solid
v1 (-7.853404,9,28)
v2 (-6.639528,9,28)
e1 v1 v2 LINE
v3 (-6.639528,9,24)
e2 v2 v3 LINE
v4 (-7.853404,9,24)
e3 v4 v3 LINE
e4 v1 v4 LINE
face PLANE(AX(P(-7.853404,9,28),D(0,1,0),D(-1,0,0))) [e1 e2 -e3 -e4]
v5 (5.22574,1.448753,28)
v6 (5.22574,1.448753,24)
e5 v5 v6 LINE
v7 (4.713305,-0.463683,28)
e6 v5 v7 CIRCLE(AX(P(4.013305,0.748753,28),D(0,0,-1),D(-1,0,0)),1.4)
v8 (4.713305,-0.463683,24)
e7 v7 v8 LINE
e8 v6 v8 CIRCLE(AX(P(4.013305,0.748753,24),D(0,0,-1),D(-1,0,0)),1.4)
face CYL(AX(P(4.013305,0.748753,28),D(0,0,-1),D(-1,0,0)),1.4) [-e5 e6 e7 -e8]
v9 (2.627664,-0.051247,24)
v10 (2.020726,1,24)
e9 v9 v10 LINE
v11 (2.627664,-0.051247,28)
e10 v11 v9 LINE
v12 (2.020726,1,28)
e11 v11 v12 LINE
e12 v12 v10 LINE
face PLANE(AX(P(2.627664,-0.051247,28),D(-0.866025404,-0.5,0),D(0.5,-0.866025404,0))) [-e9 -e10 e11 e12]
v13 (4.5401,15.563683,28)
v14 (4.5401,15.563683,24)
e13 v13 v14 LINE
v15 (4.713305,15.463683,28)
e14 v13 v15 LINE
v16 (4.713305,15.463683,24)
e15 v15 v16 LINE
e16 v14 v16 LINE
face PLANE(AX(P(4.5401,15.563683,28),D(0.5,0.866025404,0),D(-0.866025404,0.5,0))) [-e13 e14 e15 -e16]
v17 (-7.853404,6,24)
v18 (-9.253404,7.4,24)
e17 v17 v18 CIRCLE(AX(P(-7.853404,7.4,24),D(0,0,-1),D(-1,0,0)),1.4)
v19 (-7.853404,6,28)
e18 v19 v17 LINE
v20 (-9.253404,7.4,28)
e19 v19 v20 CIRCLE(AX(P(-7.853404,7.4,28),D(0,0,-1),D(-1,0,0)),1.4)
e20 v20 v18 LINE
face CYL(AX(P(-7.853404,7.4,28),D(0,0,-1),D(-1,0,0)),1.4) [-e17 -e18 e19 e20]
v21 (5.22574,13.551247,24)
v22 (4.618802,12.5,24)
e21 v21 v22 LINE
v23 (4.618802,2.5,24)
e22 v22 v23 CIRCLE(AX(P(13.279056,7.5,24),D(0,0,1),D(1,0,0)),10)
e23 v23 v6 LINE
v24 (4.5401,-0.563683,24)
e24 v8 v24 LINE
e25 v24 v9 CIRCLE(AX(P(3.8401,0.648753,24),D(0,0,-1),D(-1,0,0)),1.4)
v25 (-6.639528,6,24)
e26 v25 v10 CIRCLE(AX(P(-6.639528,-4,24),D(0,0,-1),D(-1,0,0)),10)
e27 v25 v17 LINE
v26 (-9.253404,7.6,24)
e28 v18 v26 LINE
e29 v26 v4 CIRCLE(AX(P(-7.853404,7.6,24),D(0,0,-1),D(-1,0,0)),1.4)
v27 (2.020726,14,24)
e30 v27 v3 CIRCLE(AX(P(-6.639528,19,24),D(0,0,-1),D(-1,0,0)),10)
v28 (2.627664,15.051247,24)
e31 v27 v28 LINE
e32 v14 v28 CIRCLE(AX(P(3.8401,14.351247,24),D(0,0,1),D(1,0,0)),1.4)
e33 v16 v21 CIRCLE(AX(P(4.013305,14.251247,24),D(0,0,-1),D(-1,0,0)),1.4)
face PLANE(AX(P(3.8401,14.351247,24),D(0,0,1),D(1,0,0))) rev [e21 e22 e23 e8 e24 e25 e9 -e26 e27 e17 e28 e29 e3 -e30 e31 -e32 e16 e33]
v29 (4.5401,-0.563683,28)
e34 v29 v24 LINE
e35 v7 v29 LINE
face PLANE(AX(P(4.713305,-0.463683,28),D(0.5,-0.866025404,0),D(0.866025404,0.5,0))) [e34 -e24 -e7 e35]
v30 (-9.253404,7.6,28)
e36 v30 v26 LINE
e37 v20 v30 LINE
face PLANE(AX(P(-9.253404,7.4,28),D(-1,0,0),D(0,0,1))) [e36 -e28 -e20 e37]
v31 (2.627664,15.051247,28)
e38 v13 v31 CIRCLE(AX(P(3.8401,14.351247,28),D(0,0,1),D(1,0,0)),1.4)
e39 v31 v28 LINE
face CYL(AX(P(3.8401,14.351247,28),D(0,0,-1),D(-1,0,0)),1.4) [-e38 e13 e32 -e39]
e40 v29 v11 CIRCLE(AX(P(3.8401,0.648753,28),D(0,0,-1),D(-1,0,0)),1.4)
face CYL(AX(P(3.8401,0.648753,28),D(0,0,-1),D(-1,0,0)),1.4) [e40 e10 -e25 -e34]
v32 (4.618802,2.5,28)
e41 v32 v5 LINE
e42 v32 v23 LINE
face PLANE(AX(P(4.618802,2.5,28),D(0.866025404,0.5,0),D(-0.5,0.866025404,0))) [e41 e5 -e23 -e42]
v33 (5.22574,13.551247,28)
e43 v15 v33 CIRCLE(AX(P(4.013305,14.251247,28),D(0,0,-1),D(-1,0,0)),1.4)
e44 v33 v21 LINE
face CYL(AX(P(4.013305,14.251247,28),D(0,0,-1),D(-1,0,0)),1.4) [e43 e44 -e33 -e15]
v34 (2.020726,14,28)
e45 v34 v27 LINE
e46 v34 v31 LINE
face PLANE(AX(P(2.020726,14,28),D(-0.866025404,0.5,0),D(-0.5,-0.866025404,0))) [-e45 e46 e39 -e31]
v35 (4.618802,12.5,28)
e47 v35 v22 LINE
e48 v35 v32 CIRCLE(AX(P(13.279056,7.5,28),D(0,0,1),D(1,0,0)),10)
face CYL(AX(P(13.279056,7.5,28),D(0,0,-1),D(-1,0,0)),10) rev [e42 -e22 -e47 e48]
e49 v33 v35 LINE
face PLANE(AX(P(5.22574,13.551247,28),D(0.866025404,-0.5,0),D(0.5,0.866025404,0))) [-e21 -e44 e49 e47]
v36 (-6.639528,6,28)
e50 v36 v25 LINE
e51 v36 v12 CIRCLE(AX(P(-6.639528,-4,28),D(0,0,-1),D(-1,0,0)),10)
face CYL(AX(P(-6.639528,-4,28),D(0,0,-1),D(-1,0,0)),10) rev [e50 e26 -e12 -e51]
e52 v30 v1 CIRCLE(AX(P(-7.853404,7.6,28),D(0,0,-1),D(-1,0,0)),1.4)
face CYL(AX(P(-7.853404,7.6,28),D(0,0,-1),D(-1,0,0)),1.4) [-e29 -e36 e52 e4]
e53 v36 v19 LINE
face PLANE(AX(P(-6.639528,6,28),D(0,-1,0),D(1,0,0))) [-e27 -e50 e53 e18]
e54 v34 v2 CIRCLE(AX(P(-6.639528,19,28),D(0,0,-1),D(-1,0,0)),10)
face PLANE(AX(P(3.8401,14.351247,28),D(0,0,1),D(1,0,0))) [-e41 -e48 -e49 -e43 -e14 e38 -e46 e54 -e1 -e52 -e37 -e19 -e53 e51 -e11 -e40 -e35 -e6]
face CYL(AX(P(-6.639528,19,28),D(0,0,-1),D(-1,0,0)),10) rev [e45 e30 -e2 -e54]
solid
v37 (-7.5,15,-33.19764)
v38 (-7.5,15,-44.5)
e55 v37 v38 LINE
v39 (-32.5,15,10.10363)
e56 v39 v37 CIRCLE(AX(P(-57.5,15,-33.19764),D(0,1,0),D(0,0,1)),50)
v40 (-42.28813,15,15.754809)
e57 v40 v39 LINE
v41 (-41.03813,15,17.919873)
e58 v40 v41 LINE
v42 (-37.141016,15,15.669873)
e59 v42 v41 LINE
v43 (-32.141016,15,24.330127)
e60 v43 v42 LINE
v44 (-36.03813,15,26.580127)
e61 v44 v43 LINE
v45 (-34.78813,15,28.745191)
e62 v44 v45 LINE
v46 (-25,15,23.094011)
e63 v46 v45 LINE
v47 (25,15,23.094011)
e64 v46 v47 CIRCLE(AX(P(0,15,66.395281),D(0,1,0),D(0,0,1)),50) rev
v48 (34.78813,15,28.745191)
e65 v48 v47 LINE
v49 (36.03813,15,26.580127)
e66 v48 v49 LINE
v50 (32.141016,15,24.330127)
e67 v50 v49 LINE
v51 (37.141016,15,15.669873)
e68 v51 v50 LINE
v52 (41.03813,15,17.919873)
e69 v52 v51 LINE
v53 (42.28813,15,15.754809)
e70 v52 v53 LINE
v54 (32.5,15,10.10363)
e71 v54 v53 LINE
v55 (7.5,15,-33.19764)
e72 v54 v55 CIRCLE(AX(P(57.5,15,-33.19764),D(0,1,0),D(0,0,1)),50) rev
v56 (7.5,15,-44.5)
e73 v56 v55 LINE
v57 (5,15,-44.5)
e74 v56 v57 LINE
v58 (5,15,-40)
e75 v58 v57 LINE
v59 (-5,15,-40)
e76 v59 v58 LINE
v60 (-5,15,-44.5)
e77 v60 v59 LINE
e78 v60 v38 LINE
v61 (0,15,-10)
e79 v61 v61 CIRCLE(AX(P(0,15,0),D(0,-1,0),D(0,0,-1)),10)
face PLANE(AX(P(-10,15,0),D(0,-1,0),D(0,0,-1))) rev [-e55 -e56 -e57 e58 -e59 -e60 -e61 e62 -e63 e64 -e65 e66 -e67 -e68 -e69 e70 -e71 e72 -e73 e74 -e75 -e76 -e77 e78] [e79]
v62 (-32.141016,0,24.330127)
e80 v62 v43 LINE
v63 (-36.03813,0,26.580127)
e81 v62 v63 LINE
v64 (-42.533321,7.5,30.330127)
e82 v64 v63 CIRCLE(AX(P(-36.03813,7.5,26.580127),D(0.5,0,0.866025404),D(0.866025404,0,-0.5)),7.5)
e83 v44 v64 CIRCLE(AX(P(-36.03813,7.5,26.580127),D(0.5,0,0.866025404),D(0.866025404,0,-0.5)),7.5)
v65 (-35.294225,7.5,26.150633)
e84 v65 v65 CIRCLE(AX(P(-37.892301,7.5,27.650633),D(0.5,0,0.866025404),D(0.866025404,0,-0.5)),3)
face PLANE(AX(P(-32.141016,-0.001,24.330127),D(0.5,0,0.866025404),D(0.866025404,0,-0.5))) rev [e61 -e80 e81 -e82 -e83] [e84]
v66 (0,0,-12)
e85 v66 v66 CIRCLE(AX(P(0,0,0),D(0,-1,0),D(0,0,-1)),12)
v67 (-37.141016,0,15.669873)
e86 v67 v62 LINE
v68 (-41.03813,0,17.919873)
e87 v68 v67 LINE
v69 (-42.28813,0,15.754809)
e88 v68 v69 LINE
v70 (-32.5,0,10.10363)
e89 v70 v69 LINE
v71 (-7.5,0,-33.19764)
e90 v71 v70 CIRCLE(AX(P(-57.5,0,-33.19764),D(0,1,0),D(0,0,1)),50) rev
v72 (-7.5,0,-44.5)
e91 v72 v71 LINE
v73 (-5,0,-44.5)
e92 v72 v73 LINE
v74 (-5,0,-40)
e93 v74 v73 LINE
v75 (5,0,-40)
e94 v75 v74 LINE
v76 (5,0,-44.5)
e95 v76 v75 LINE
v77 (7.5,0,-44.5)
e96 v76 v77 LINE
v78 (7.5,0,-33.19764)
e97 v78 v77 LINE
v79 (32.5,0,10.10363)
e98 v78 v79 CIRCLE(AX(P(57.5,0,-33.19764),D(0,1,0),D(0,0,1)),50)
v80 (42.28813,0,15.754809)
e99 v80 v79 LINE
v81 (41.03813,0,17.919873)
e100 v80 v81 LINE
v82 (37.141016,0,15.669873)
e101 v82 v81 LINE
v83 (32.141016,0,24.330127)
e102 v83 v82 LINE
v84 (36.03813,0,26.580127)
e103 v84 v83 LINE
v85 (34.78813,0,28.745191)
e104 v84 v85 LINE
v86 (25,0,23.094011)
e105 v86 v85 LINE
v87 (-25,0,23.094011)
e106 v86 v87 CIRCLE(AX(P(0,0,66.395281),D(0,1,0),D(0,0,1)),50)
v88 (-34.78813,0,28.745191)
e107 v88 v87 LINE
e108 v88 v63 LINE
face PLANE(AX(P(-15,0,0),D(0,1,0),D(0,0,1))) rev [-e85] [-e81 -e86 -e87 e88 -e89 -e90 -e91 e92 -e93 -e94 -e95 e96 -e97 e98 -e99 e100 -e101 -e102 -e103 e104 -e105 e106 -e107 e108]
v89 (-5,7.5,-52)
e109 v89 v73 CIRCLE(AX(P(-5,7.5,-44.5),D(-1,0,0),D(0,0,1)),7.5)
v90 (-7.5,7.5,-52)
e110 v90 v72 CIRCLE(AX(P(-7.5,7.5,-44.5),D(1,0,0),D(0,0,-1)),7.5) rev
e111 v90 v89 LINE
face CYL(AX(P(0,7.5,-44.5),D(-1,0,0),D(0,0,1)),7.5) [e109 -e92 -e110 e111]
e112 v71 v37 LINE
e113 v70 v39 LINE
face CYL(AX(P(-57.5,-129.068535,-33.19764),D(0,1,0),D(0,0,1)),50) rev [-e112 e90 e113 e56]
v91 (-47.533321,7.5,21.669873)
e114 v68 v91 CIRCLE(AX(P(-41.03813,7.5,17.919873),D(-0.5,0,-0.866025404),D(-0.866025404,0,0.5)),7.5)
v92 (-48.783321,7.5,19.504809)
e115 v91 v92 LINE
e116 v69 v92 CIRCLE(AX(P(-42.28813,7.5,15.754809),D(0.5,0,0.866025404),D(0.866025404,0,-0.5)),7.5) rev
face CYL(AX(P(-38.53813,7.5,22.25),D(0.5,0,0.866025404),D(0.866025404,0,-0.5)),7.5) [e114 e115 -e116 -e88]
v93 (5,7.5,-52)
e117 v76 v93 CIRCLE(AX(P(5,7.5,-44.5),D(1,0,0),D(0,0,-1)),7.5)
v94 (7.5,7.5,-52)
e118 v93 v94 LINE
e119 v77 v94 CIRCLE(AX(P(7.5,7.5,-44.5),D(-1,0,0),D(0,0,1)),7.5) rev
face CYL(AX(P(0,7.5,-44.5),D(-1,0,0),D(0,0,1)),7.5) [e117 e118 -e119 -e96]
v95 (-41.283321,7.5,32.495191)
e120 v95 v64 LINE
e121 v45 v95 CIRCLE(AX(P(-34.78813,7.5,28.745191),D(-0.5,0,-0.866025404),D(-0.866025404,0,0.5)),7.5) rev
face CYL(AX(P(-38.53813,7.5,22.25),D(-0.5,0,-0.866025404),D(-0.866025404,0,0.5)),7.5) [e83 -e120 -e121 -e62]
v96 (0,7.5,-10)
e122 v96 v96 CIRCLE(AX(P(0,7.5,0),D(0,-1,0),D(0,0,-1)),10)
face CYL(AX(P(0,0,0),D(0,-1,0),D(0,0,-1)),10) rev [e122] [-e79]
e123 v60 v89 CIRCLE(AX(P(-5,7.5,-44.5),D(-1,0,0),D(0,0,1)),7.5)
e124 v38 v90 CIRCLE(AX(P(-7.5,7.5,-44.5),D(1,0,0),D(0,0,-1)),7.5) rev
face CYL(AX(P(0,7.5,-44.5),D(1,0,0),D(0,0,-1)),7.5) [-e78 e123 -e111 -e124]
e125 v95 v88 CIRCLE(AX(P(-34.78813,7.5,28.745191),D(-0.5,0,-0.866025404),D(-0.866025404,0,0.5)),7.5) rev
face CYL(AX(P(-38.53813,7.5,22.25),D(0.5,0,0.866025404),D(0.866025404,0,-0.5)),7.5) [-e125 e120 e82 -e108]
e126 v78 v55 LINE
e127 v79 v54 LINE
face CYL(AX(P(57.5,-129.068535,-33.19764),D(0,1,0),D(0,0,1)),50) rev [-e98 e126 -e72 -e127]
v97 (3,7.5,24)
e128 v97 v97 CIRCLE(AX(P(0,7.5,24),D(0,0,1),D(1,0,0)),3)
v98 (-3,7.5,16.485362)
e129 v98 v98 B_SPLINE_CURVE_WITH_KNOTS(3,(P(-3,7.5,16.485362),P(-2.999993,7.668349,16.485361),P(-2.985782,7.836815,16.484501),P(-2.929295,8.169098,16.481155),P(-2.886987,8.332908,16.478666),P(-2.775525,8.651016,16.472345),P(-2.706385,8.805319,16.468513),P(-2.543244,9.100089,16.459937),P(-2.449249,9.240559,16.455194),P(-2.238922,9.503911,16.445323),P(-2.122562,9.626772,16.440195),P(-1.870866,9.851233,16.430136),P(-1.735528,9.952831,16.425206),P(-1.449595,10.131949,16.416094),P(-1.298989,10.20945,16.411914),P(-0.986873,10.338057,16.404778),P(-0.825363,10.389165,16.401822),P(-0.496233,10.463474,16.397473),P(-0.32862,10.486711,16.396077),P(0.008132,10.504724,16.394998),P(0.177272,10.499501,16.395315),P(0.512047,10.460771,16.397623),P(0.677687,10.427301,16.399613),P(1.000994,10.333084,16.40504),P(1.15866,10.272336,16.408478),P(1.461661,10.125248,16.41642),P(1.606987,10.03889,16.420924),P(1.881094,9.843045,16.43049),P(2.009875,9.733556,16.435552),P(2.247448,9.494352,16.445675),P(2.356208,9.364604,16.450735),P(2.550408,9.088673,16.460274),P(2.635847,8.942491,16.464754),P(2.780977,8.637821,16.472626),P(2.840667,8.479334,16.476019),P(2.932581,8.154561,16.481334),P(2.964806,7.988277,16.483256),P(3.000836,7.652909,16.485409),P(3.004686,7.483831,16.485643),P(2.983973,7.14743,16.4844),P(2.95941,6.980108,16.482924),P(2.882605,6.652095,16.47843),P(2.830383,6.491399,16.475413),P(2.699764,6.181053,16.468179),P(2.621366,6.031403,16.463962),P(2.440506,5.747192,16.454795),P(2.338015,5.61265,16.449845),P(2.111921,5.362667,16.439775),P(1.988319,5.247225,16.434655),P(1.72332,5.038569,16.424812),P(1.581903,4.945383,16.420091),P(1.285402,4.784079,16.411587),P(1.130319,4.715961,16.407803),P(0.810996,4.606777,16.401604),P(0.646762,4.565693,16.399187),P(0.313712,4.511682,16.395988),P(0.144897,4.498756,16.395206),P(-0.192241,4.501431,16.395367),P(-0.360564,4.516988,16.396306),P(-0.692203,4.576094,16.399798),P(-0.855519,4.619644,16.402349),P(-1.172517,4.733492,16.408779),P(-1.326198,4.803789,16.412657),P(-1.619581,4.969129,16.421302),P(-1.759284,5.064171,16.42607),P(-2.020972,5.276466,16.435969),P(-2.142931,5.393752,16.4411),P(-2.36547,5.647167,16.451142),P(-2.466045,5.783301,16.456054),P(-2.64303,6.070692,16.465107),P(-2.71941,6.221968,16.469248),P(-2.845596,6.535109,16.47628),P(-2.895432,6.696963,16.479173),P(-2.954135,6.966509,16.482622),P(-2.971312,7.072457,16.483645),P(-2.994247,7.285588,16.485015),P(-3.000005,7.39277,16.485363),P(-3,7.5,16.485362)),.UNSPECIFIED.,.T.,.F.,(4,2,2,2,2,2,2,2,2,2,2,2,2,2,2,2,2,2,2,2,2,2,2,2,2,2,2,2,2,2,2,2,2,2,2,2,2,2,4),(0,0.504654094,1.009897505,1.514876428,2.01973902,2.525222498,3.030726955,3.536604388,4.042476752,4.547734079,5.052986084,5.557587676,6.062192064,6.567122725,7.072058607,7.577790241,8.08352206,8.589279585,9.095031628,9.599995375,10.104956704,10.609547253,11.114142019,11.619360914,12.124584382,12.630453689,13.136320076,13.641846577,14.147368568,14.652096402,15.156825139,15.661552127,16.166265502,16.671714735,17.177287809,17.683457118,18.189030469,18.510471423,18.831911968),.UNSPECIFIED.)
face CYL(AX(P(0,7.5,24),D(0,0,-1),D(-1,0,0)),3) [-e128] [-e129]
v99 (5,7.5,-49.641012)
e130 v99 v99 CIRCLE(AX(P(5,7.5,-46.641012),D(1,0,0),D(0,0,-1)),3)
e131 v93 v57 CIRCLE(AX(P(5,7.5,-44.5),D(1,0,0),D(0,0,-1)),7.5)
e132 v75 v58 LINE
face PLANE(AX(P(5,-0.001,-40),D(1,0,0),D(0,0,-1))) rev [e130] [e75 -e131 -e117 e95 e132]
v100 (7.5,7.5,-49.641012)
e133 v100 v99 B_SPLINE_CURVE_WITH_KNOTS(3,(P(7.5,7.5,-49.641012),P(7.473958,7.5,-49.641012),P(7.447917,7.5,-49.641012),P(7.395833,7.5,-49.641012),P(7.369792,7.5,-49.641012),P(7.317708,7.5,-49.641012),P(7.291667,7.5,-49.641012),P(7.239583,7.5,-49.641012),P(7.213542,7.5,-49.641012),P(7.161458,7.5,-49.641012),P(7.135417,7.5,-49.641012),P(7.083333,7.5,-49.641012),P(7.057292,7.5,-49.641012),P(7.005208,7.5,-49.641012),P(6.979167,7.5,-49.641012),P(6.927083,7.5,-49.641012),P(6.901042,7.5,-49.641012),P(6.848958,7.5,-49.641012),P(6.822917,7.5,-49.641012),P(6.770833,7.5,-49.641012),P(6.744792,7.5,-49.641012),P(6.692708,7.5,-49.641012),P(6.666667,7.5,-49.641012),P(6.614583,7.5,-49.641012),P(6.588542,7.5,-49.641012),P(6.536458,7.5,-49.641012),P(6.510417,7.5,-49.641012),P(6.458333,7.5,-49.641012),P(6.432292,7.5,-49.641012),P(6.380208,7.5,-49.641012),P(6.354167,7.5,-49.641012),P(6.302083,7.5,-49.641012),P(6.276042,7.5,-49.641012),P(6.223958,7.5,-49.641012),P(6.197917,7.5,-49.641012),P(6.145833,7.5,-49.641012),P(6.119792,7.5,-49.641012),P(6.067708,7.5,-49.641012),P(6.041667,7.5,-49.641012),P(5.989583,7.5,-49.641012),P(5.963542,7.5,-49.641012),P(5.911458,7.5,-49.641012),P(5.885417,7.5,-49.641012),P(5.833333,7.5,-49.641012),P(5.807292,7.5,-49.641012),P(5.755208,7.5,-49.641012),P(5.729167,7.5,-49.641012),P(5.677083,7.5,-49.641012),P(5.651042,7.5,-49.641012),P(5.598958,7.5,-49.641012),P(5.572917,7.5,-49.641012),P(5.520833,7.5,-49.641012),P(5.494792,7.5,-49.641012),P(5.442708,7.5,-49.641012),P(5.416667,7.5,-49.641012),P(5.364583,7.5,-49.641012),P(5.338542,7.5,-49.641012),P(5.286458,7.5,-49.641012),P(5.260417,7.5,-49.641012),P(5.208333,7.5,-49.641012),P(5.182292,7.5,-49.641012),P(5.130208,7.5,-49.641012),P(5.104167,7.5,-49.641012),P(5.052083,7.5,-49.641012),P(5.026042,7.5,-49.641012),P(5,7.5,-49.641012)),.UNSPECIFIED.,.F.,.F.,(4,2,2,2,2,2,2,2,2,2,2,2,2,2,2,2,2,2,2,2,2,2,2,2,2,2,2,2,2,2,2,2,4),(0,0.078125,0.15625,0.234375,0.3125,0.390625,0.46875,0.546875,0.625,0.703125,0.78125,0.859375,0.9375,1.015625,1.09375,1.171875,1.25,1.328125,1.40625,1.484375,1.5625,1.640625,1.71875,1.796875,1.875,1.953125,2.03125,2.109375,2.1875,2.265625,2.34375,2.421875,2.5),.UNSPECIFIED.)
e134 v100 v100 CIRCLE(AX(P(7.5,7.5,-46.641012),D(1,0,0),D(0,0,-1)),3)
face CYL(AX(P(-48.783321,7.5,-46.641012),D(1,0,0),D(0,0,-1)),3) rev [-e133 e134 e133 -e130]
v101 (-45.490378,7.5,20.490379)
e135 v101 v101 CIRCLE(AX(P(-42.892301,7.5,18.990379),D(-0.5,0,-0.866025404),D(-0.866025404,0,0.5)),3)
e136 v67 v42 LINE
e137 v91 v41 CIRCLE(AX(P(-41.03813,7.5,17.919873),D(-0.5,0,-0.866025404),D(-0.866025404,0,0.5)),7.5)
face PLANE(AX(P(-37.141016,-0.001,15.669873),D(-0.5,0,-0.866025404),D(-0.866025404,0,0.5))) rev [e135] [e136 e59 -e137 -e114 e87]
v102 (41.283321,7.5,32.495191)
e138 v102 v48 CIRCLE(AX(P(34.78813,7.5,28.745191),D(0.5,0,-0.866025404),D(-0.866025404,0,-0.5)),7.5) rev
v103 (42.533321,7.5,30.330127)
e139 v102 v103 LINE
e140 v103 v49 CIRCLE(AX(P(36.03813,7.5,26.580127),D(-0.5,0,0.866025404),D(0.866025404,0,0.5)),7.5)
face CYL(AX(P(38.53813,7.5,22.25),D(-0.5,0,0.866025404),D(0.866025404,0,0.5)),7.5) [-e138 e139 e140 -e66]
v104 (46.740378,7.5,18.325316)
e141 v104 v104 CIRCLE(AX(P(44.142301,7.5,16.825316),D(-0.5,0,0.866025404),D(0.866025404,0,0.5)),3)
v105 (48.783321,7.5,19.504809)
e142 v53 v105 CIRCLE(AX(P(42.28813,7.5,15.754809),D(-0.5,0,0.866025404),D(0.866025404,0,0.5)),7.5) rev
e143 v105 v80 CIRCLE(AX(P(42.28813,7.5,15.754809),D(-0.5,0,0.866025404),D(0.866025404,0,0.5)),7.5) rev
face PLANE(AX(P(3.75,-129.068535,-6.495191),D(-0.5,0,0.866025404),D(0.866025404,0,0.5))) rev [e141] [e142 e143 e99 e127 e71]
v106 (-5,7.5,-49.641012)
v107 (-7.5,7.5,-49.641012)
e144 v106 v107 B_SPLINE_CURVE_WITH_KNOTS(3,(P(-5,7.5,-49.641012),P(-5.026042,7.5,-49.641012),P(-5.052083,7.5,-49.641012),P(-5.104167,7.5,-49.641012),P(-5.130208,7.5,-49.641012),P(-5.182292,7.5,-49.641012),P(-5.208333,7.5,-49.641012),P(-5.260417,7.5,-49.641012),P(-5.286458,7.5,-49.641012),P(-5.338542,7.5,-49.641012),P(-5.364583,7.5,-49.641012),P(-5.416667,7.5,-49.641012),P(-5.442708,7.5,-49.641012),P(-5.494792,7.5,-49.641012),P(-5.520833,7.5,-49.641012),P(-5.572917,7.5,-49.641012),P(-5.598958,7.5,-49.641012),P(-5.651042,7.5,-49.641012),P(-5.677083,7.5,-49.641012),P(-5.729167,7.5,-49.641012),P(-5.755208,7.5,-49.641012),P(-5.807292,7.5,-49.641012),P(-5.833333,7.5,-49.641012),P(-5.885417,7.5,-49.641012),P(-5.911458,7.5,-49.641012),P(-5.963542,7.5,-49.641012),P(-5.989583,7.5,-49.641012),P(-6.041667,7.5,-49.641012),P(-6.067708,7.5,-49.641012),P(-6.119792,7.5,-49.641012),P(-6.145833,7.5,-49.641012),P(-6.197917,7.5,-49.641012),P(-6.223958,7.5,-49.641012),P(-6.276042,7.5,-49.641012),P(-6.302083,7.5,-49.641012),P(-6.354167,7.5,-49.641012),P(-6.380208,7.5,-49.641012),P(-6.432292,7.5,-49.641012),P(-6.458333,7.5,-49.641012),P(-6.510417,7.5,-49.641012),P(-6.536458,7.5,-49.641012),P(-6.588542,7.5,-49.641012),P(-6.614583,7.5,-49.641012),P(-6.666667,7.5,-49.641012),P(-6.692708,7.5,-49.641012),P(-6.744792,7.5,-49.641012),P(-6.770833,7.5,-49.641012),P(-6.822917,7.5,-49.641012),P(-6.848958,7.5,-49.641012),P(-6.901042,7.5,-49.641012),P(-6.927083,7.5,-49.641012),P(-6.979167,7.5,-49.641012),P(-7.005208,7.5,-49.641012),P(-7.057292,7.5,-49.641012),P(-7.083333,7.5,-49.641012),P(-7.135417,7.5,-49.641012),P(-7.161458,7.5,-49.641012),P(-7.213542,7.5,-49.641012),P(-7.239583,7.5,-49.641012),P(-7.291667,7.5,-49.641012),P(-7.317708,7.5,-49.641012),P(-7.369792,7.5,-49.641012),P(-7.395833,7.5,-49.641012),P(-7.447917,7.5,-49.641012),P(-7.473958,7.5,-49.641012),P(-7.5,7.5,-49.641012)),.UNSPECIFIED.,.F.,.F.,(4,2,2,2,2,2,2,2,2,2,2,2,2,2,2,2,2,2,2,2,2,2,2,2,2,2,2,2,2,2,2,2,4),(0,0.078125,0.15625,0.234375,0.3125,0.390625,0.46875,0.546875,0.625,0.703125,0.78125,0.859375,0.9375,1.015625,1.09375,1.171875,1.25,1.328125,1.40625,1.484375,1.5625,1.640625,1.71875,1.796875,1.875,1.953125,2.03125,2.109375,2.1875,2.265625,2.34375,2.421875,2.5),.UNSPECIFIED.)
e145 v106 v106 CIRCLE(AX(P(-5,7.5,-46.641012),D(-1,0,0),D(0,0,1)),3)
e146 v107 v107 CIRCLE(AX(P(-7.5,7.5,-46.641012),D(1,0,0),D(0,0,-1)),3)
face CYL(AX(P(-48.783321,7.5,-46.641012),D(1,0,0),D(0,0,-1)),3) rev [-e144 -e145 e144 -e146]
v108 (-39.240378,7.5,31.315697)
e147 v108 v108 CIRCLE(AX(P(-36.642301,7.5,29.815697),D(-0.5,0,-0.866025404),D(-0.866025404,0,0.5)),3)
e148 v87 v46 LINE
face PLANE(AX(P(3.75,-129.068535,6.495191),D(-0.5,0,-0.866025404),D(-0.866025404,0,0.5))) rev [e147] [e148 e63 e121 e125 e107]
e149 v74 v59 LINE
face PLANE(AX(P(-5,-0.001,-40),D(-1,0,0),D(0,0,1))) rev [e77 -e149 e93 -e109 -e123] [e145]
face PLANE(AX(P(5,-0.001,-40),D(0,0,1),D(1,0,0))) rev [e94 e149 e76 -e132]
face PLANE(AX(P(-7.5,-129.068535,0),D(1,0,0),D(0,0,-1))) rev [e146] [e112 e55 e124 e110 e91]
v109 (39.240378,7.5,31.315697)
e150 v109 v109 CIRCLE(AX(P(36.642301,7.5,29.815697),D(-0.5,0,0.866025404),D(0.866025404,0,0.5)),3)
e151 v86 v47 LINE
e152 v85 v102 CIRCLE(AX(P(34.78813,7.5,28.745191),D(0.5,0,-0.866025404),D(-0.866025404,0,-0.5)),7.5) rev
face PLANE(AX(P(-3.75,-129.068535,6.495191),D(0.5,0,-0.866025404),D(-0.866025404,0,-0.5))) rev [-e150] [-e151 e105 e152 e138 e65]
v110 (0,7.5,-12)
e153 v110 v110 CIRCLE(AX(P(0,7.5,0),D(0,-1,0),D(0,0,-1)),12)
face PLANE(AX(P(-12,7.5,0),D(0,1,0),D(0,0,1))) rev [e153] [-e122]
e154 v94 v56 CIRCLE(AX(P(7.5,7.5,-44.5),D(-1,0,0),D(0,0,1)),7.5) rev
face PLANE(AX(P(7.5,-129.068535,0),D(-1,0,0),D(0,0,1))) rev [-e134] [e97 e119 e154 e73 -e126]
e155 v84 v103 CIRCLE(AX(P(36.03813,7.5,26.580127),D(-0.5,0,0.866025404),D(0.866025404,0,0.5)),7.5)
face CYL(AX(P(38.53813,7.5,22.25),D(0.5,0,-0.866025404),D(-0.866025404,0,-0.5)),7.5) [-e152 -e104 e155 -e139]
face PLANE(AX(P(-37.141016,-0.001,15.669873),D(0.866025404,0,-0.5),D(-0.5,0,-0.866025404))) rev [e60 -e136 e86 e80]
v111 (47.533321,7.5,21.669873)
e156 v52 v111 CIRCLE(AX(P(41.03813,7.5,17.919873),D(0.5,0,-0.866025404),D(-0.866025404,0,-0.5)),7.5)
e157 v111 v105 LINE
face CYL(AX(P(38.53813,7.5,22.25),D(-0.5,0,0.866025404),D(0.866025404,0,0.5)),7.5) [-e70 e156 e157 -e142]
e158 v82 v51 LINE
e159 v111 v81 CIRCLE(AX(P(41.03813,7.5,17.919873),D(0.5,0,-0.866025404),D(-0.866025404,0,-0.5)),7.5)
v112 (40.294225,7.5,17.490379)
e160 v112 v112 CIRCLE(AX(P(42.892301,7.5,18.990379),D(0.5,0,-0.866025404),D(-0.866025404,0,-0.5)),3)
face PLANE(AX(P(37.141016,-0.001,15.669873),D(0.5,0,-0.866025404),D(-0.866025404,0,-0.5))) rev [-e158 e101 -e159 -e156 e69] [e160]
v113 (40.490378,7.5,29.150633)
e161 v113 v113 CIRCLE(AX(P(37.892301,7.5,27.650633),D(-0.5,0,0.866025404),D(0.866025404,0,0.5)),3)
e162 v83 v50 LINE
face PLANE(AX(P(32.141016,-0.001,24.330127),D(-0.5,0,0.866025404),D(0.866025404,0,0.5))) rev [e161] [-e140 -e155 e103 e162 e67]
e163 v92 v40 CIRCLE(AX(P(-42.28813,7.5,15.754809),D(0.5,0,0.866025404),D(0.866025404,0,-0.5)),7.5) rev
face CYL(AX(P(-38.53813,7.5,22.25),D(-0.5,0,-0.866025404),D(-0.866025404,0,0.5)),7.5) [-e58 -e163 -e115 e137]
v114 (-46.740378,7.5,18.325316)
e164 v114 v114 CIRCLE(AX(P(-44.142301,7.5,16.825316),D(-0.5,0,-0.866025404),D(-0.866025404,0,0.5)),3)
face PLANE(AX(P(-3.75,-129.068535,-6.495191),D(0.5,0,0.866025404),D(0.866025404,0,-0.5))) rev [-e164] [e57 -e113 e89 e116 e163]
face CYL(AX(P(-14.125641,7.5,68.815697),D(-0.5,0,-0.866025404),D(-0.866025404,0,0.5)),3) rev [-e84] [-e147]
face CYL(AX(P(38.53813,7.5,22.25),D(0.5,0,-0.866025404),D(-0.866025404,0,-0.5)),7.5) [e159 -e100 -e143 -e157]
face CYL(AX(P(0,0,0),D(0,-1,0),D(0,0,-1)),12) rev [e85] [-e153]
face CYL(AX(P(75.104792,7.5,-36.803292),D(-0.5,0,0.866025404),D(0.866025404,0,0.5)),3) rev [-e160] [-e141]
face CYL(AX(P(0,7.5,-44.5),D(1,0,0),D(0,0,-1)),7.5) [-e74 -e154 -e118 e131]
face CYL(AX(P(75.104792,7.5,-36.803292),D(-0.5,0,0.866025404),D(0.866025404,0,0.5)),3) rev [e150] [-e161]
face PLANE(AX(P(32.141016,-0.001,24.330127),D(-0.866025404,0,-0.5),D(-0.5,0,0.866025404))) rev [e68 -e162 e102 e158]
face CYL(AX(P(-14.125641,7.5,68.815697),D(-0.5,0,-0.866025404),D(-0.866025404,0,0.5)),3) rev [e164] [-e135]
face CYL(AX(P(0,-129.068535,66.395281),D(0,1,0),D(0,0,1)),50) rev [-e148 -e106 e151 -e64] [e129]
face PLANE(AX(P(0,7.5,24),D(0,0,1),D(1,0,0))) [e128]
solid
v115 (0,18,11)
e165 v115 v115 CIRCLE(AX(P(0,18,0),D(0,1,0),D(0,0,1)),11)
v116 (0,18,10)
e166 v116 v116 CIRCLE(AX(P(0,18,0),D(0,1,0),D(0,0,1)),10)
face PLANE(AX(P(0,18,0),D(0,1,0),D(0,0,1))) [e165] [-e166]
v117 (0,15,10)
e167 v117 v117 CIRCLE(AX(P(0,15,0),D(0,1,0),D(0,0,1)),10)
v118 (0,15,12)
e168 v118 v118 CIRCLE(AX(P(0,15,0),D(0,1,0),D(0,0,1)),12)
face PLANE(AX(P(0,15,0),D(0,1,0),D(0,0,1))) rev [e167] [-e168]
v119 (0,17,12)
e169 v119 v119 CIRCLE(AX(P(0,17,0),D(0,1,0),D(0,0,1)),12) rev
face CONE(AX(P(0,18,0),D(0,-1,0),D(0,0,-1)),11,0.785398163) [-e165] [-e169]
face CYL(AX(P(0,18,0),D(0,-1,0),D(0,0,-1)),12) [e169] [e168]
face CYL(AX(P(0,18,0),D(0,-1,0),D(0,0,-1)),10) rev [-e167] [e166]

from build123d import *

# Parameters (mm, degrees)
BOSS_EXTRU_1_START           = -15
ESQUISSE2_R                  = 15
BOSS_EXTRU_1_DEPTH           = 15
CONG_1_R                     = 7.5
ENL_V_MAT_EXTRU_1_REACH      = 74.862
ESQUISSE3_W                  = 10
ESQUISSE3_H                  = 42.147578144
ESQUISSE4_R                  = 3
ENL_V_MAT_EXTRU_2_DEPTH      = 79.082086437
R_P_TITION_CIRCULAIRE5_COUNT = 3
ESQUISSE5_R                  = 3
BOSS_EXTRU_2_DEPTH           = 24
ESQUISSE6_R                  = 10
ENL_V_MAT_EXTRU_3_DEPTH      = 24
ENL_V_START                  = -7.5
ESQUISSE7_R                  = 12
ENL_V_MAT_EXTRU_5_DEPTH      = 7.5
BOSS_EXTRU_3_DEPTH           = 4
BOSS_EXTRU_5_START           = 3
ESQUISSE10_R                 = 12
ESQUISSE10_R_2               = 10
BOSS_EXTRU_5_DEPTH           = 3
CHANFREIN1_SIZE              = 1


with BuildPart() as part:
    # Esquisse1 → Révolution1 (revolve)
    with BuildSketch(Plane.XY, mode=Mode.PRIVATE) as r_volution1_sk:
        Polygon((-12, 0), (-12, 7.5), (-10, 7.5), (-10, 15), (-15, 15), (-15, 0), align=None)
    revolve(r_volution1_sk.sketch.rotate(Axis((0, 0, 0), (0, 1, 0)), 270), axis=Axis((0, 0, 0), (0, 1, 0)))

    # Esquisse2 → Boss.-Extru.1 (add)
    with BuildSketch(Plane(origin=(0, 15, 0), x_dir=(1, 0, 0), z_dir=(0, 1, 0)).offset(BOSS_EXTRU_1_START)):
        with BuildLine():
            Line((-7.5, 33.197640478), (-7.5, 52))
            Line((-7.5, 52), (7.5, 52))
            Line((7.5, 52), (7.5, 33.197640478))
            ThreePointArc((7.5, 33.197640478), (14.198729811, 8.197640478), (32.5, -10.103629711))
            Line((32.5, -10.103629711), (48.783320997, -19.504809472))
            Line((48.783320997, -19.504809472), (41.283320997, -32.495190528))
            Line((41.283320997, -32.495190528), (25, -23.094010768))
            ThreePointArc((25, -23.094010768), (0, -16.395280957), (-25, -23.094010768))
            Line((-25, -23.094010768), (-41.283320997, -32.495190528))
            Line((-41.283320997, -32.495190528), (-48.783320997, -19.504809472))
            Line((-48.783320997, -19.504809472), (-32.5, -10.103629711))
            ThreePointArc((-32.5, -10.103629711), (-14.198729811, 8.197640478), (-7.5, 33.197640478))
        make_face()
        Circle(ESQUISSE2_R, mode=Mode.SUBTRACT)
    extrude(amount=BOSS_EXTRU_1_DEPTH)

    # Congé1
    cong_1_edges = [part.edges().sort_by_distance(p)[0] for p in [
        (0, 0, -52),
        (0, 15, -52),
        (45.033320997, 0, 26),
        (45.033320997, 15, 26),
        (-45.033320997, 0, 26),
        (-45.033320997, 15, 26),
    ]]
    fillet(cong_1_edges, radius=CONG_1_R - 0.0001)  # a hair under: the kernel refuses the full size

    # Esquisse3 → Enlèv. mat.-Extru.1 (cut, up to next)
    with BuildSketch(Plane(origin=(0, 15, 0), x_dir=(1, 0, 0), z_dir=(0, 1, 0)), mode=Mode.PRIVATE) as enl_v_mat_extru_1_sk1:
        with Locations((0, 61.073789072)):
            Rectangle(ESQUISSE3_W, ESQUISSE3_H)
    enl_v_mat_extru_1_tool1 = extrude(enl_v_mat_extru_1_sk1.sketch, amount=-ENL_V_MAT_EXTRU_1_REACH, mode=Mode.PRIVATE) & part.part
    # Esquisse3 → Enlèv. mat.-Extru.1 (cut, up to next)
    with BuildSketch(Plane(origin=(0, 15, 0), x_dir=(1, 0, 0), z_dir=(0, 1, 0)), mode=Mode.PRIVATE) as enl_v_mat_extru_1_sk2:
        Polygon((32.141016151, -24.330127019), (37.141016151, -15.669872981), (73.641889532, -36.743662053), (68.641889532, -45.403916091), align=None)
    enl_v_mat_extru_1_tool2 = extrude(enl_v_mat_extru_1_sk2.sketch, amount=-ENL_V_MAT_EXTRU_1_REACH, mode=Mode.PRIVATE) & part.part
    # Esquisse3 → Enlèv. mat.-Extru.1 (cut, up to next)
    with BuildSketch(Plane(origin=(0, 15, 0), x_dir=(1, 0, 0), z_dir=(0, 1, 0)), mode=Mode.PRIVATE) as enl_v_mat_extru_1_sk3:
        Polygon((-37.141016151, -15.669872981), (-32.141016151, -24.330127019), (-68.641889532, -45.403916091), (-73.641889532, -36.743662053), align=None)
    enl_v_mat_extru_1_tool3 = extrude(enl_v_mat_extru_1_sk3.sketch, amount=-ENL_V_MAT_EXTRU_1_REACH, mode=Mode.PRIVATE) & part.part
    add(enl_v_mat_extru_1_tool1.solids().sort_by_distance((0, 15, -61.073789))[0], mode=Mode.SUBTRACT)
    add(enl_v_mat_extru_1_tool2.solids().sort_by_distance((52.891453, 15, 30.536895))[0], mode=Mode.SUBTRACT)
    add(enl_v_mat_extru_1_tool3.solids().sort_by_distance((-52.891453, 15, 30.536895))[0], mode=Mode.SUBTRACT)

    # Esquisse4 → Enlèv. mat.-Extru.2 (cut, through all)
    with BuildSketch(Plane(origin=(7.5, 0, 0), x_dir=(0, 0, -1), z_dir=(1, 0, 0))):
        with Locations((46.641012263, 7.5)):
            Circle(ESQUISSE4_R)
    enl_v_mat_extru_2 = extrude(amount=-ENL_V_MAT_EXTRU_2_DEPTH, mode=Mode.SUBTRACT)

    # Répétition circulaire5: Enlèv. mat.-Extru.2 ×3 about axis
    r_p_tition_circulaire5_axis = Axis((0, 0, 0), (0, 1, 0))
    for i in range(1, R_P_TITION_CIRCULAIRE5_COUNT):
        add(enl_v_mat_extru_2.rotate(r_p_tition_circulaire5_axis, i * 360 / R_P_TITION_CIRCULAIRE5_COUNT), mode=Mode.SUBTRACT)

    # Esquisse5 → Boss.-Extru.2 (add)
    with BuildSketch(Plane.XY):
        with Locations(Location((0, 7.5, 0), (0, 0, 180))):
            Circle(ESQUISSE5_R)
    extrude(amount=BOSS_EXTRU_2_DEPTH)

    # Esquisse6 → Enlèv. mat.-Extru.3 (cut)
    with BuildSketch(Plane(origin=(0, 15, 0), x_dir=(1, 0, 0), z_dir=(0, 1, 0))):
        with Locations(Location((0, 0, 0), (0, 0, 90))):
            Circle(ESQUISSE6_R)
    extrude(amount=-ENL_V_MAT_EXTRU_3_DEPTH, mode=Mode.SUBTRACT)

    # Esquisse7 → Enlèv. mat.-Extru.5 (cut)
    with BuildSketch(Plane.XZ.offset(ENL_V_START)):
        with Locations(Location((0, 0, 0), (0, 0, 270))):
            Circle(ESQUISSE7_R)
    extrude(amount=ENL_V_MAT_EXTRU_5_DEPTH, mode=Mode.SUBTRACT)


with BuildPart() as body_2:
    # Esquisse8 → Boss.-Extru.3 (new body)
    with BuildSketch(Plane.XY.offset(24)):
        with BuildLine():
            Line((-6.639528096, 6), (-7.853404144, 6))
            ThreePointArc((-7.853404144, 6), (-8.843353638, 6.410050506), (-9.253404144, 7.4))
            Line((-9.253404144, 7.4), (-9.253404144, 7.6))
            ThreePointArc((-9.253404144, 7.6), (-8.843353638, 8.589949494), (-7.853404144, 9))
            Line((-7.853404144, 9), (-6.639528096, 9))
            ThreePointArc((-6.639528096, 9), (-1.639528096, 10.339745962), (2.020725942, 14))
            Line((2.020725942, 14), (2.627663966, 15.051247495))
            ThreePointArc((2.627663966, 15.051247495), (3.477752868, 15.703543652), (4.540099532, 15.56368306))
            Line((4.540099532, 15.56368306), (4.713304612, 15.46368306))
            ThreePointArc((4.713304612, 15.46368306), (5.365600769, 14.613594158), (5.225740178, 13.551247495))
            Line((5.225740178, 13.551247495), (4.618802154, 12.5))
            ThreePointArc((4.618802154, 12.5), (3.279056191, 7.5), (4.618802154, 2.5))
            Line((4.618802154, 2.5), (5.225740178, 1.448752505))
            ThreePointArc((5.225740178, 1.448752505), (5.365600769, 0.386405842), (4.713304612, -0.46368306))
            Line((4.713304612, -0.46368306), (4.540099532, -0.56368306))
            ThreePointArc((4.540099532, -0.56368306), (3.477752868, -0.703543652), (2.627663966, -0.051247495))
            Line((2.627663966, -0.051247495), (2.020725942, 1))
            ThreePointArc((2.020725942, 1), (-1.639528096, 4.660254038), (-6.639528096, 6))
        make_face()
    extrude(amount=BOSS_EXTRU_3_DEPTH)


with BuildPart() as body_3:
    # Esquisse10 → Boss.-Extru.5 (new body)
    with BuildSketch(Plane(origin=(0, 15, 0), x_dir=(1, 0, 0), z_dir=(0, 1, 0)).offset(BOSS_EXTRU_5_START)):
        with Locations(Location((0, 0, 0), (0, 0, 270))):
            Circle(ESQUISSE10_R)
        with Locations(Location((0, 0, 0), (0, 0, 270))):
            Circle(ESQUISSE10_R_2, mode=Mode.SUBTRACT)
    extrude(amount=-BOSS_EXTRU_5_DEPTH)

    # Chanfrein1
    chanfrein1_edges = [body_3.edges().sort_by_distance(p)[0] for p in [
        (0, 18, -12),
    ]]
    chamfer(chanfrein1_edges, length=CHANFREIN1_SIZE)


solid = Compound([part.part, body_2.part, body_3.part])
